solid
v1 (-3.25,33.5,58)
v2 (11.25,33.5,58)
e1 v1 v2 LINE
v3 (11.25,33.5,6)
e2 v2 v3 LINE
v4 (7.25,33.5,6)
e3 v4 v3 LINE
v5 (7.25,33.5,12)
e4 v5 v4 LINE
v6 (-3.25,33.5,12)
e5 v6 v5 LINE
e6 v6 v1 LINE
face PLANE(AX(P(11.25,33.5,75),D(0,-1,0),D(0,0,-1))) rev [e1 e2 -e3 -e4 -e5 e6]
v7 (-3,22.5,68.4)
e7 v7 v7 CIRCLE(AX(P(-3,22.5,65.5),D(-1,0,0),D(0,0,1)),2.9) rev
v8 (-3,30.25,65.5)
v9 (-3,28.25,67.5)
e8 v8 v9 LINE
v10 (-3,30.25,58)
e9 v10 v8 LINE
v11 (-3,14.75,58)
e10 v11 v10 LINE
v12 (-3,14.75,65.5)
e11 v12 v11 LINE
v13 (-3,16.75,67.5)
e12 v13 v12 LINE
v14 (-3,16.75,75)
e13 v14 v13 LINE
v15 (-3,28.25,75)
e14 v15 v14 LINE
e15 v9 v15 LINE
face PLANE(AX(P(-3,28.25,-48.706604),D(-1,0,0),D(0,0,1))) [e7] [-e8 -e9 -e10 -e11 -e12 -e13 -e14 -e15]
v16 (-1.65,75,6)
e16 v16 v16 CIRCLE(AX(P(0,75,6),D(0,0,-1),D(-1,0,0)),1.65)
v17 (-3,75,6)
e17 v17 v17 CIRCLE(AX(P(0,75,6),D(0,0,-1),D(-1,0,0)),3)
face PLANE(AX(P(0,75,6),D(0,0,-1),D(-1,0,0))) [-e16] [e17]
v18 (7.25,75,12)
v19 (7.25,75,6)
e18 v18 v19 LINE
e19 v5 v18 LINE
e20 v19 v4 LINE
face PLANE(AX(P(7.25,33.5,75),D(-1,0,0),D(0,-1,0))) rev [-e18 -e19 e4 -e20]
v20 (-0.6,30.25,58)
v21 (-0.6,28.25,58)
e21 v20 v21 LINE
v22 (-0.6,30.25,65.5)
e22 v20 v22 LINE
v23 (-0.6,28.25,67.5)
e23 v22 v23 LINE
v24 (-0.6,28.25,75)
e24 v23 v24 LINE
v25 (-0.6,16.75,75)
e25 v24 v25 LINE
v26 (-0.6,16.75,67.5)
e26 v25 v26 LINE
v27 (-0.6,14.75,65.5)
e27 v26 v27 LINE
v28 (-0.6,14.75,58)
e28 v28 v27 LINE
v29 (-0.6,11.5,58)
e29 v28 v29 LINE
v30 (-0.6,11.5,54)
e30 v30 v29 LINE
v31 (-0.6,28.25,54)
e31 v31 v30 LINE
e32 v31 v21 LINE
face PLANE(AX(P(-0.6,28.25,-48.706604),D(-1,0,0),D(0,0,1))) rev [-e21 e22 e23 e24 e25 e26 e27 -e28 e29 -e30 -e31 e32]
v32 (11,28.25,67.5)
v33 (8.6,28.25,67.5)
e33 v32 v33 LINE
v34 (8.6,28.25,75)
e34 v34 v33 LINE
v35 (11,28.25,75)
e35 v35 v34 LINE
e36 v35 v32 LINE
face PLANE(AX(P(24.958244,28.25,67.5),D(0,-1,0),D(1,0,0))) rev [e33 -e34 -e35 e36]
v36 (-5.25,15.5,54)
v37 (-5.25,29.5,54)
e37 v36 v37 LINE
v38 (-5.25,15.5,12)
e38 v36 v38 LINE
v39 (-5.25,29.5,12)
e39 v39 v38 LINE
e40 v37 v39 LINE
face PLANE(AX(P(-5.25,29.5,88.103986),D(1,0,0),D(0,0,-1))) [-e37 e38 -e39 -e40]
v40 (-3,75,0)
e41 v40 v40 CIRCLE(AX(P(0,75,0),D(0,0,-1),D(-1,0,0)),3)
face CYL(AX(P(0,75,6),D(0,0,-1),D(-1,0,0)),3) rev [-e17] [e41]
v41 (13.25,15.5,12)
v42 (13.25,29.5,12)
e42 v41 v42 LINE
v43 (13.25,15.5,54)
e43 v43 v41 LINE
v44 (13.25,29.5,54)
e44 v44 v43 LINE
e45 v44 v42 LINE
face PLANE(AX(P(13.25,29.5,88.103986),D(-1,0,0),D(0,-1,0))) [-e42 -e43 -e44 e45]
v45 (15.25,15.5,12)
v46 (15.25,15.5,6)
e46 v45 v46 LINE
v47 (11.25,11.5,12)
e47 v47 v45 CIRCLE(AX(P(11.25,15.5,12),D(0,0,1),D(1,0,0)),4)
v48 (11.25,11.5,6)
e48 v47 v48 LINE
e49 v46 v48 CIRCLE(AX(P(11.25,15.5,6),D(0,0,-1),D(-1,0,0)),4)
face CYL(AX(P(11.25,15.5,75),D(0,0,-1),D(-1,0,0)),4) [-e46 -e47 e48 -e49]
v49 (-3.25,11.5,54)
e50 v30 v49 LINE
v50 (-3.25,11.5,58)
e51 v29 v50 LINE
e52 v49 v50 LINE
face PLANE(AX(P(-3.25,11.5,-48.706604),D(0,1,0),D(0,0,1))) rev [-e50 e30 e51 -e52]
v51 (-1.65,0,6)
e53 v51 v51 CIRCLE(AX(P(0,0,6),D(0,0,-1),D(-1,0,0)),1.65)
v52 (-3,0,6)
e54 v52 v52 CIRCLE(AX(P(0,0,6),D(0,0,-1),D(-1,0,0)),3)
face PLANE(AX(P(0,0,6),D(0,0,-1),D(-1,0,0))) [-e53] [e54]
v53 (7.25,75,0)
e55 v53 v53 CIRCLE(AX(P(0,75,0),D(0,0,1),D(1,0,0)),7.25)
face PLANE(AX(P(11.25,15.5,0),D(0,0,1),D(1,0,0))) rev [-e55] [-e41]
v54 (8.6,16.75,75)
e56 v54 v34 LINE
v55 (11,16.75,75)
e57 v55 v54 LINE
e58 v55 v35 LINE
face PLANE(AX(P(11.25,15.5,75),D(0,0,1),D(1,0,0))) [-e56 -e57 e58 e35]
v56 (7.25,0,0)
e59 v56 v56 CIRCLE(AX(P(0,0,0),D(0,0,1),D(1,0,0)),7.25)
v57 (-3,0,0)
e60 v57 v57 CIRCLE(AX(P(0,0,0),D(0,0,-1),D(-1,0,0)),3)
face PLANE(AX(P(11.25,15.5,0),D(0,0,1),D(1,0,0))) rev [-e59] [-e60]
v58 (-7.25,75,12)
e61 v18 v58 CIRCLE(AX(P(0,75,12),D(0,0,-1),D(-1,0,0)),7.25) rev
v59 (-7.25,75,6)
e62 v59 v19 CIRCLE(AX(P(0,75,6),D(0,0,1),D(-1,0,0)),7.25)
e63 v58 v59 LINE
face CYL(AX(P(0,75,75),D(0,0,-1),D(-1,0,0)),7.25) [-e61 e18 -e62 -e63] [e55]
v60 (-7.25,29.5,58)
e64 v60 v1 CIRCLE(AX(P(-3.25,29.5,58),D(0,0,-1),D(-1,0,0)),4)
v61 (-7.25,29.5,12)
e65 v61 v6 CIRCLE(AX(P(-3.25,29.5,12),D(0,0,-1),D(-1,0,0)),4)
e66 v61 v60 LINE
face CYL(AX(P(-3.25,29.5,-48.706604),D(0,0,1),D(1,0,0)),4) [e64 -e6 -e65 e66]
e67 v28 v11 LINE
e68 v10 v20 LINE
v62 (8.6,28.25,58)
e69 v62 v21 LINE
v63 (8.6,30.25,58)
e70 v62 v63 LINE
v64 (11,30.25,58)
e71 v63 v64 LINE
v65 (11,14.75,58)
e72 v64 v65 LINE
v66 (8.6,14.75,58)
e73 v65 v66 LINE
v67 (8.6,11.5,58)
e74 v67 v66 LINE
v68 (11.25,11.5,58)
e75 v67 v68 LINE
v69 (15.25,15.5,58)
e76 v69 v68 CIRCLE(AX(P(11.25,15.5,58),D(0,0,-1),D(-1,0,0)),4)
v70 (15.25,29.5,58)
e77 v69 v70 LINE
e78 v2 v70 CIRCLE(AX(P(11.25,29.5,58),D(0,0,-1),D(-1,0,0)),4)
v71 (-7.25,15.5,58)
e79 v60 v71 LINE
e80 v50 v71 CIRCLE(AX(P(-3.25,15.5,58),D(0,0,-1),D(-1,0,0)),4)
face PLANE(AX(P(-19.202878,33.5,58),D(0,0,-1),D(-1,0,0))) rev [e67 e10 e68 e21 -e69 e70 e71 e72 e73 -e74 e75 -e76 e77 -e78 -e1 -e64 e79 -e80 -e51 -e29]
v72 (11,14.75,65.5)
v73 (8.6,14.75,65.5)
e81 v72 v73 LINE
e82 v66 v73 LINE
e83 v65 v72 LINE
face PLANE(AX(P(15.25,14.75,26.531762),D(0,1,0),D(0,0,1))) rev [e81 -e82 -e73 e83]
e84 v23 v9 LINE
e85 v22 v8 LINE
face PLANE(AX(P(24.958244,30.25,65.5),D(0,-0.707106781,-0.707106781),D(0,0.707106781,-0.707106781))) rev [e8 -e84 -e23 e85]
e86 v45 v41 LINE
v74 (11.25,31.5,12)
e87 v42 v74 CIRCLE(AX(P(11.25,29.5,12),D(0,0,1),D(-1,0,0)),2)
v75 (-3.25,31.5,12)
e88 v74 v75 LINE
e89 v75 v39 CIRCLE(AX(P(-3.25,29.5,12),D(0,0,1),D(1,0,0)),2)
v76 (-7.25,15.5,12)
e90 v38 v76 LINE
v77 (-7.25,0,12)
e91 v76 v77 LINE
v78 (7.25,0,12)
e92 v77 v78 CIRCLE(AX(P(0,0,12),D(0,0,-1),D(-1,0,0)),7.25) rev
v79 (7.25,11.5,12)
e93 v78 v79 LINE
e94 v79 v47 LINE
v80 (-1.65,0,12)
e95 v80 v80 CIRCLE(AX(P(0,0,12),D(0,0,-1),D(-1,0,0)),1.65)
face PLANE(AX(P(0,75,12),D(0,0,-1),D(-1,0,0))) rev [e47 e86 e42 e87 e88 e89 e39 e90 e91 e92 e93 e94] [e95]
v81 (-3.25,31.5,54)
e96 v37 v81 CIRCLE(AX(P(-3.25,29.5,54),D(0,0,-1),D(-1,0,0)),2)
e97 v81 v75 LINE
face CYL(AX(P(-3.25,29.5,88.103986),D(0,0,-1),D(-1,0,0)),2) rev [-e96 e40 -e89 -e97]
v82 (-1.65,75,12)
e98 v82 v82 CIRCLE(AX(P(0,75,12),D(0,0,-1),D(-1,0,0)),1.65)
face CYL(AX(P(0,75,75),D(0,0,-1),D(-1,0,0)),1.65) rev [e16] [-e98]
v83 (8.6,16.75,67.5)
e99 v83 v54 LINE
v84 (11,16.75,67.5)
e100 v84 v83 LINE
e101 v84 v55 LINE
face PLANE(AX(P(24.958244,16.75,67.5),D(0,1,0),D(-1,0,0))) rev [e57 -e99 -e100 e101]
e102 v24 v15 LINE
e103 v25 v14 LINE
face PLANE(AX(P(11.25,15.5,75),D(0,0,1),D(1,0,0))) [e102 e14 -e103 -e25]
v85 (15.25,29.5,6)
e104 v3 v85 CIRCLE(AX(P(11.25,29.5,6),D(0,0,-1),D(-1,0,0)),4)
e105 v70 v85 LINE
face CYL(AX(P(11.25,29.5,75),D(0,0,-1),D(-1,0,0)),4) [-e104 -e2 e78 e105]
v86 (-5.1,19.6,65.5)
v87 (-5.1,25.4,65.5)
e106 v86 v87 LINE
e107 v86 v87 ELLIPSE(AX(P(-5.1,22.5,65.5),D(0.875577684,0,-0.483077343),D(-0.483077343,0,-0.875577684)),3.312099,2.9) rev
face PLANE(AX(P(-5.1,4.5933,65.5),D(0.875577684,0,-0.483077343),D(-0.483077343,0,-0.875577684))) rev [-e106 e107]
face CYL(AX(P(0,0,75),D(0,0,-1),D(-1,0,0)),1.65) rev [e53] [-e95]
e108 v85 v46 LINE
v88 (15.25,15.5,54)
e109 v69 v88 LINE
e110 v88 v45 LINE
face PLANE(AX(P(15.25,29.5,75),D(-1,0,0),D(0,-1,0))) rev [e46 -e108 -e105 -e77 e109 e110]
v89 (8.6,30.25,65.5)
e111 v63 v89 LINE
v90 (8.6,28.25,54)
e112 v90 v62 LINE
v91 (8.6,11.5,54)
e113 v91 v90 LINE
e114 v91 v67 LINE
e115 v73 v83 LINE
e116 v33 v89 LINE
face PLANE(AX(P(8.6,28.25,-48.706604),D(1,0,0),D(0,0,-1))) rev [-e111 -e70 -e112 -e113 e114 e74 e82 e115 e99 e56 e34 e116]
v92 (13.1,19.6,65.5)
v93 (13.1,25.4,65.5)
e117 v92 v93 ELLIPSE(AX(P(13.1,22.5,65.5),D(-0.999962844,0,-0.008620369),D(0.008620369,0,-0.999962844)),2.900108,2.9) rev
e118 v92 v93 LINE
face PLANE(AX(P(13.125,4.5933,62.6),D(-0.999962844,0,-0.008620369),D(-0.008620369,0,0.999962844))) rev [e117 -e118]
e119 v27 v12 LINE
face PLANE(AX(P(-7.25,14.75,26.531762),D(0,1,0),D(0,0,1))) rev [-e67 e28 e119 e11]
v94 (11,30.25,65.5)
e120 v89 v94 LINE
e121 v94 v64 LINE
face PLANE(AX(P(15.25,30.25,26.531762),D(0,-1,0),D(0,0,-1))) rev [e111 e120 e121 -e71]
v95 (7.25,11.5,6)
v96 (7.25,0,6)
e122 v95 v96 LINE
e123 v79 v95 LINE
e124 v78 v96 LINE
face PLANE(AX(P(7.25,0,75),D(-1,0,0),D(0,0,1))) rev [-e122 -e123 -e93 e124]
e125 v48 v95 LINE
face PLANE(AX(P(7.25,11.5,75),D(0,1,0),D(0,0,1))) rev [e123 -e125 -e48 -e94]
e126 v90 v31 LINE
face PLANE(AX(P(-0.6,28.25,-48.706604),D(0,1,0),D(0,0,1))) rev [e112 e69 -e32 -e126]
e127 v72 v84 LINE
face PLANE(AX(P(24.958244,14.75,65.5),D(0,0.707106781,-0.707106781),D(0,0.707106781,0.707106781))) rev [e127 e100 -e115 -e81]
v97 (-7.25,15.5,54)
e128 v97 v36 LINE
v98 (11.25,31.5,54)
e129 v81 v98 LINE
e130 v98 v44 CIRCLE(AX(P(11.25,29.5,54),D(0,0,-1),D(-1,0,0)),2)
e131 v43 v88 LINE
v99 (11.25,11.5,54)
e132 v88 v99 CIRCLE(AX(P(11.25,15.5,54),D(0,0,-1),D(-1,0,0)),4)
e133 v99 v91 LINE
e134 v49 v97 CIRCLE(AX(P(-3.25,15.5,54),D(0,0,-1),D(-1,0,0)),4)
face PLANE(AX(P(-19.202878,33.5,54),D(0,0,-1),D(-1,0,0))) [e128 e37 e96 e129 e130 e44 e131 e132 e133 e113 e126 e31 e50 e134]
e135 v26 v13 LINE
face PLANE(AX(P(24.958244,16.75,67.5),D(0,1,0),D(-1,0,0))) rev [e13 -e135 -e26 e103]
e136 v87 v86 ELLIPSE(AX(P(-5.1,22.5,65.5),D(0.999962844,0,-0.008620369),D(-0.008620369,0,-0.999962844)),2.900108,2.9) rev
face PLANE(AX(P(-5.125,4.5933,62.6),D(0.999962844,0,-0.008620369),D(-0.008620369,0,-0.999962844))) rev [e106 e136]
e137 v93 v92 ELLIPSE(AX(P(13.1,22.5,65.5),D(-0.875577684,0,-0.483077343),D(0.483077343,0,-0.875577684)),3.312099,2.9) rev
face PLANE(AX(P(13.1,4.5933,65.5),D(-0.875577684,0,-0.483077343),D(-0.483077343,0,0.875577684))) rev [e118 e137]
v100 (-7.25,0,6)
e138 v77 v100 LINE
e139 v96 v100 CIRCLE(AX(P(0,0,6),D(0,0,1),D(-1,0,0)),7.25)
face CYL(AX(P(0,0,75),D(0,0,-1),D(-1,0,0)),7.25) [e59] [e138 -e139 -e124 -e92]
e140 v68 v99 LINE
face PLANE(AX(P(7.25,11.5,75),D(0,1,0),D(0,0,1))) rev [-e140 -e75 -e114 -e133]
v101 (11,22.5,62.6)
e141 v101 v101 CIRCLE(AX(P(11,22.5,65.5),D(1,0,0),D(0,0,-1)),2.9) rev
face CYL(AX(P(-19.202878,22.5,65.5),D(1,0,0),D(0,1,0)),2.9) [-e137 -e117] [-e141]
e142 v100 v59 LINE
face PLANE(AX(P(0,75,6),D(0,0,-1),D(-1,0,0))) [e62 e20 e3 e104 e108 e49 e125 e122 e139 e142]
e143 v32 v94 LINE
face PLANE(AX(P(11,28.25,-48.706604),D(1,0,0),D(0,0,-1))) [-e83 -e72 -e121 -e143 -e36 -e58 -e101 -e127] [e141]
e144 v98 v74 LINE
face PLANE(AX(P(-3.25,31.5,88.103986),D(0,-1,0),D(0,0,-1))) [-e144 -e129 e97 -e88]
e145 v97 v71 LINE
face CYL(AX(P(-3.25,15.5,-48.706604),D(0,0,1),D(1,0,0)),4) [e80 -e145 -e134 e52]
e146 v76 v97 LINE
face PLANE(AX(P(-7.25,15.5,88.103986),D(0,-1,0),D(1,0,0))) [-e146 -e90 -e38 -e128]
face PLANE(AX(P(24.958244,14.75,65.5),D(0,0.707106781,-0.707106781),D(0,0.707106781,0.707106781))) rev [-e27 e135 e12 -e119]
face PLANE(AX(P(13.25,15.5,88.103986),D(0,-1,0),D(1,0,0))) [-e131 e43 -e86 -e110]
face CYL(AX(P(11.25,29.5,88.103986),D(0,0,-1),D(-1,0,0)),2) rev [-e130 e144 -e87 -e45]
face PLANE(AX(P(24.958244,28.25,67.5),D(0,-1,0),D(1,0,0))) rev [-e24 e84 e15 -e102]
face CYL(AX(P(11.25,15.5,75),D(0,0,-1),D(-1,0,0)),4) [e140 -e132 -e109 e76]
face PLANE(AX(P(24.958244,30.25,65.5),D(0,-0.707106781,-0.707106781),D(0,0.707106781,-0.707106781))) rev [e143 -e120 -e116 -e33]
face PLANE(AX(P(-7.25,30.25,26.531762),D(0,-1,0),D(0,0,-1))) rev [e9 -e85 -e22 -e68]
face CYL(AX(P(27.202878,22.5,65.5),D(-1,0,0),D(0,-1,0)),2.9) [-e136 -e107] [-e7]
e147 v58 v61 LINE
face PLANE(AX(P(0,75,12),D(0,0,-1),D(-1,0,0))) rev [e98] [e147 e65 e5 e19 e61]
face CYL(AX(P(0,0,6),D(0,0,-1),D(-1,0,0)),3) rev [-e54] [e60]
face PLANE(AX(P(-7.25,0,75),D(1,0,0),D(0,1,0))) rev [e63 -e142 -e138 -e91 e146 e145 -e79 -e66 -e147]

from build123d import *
from build123d.topology import SkipClean

# Parameters (mm, degrees)
SKETCH1_R           = 1.65
BOSS_EXTRUDE1_DEPTH = 75
SKETCH7_R           = 3
CUT_EXTRUDE6_DEPTH  = 6
CUT_EXTRUDE12_START = -63
CUT_EXTRUDE12_DEPTH = 63
SKETCH9_W           = 17
SKETCH9_H           = 22
SKETCH9_R           = 2.9
CUT_EXTRUDE8_DEPTH  = 4.25
CUT_EXTRUDE9_START  = -4.25
SKETCH10_W          = 17
SKETCH10_H          = 22
SKETCH10_R          = 2.9
CUT_EXTRUDE9_DEPTH  = 4.25
CUT_EXTRUDE10_DEPTH = 17
CUT_EXTRUDE11_START = -18.25
CUT_EXTRUDE11_DEPTH = 14
CUT_EXTRUDE13_START = -13.9000001
CUT_EXTRUDE13_DEPTH = 6.9000001
CUT_EXTRUDE14_DEPTH = 42


with BuildPart() as part:
    # Sketch1 → Boss-Extrude1 (new body)
    with BuildSketch(Plane.XY):
        with BuildLine():
            Line((15.25, 29.5), (15.25, 15.5))
            ThreePointArc((15.25, 15.5), (14.078427125, 12.671572875), (11.25, 11.5))
            Line((11.25, 11.5), (7.25, 11.5))
            Line((7.25, 11.5), (7.25, 0))
            ThreePointArc((7.25, 0), (0, -7.25), (-7.25, 0))
            Line((-7.25, 0), (-7.25, 75))
            ThreePointArc((-7.25, 75), (0, 82.25), (7.25, 75))
            Line((7.25, 75), (7.25, 33.5))
            Line((7.25, 33.5), (11.25, 33.5))
            ThreePointArc((11.25, 33.5), (14.078427125, 32.328427125), (15.25, 29.5))
        make_face()
        Circle(SKETCH1_R, mode=Mode.SUBTRACT)
        with Locations((0, 75)):
            Circle(SKETCH1_R, mode=Mode.SUBTRACT)
    extrude(amount=BOSS_EXTRUDE1_DEPTH)

    # Sketch7 → Cut-Extrude6 (cut)
    with SkipClean():  # the faces are left unmerged after this step: merging them gives an invalid solid
        with BuildSketch(Plane(origin=(0, 0, 0), x_dir=(-1, 0, 0), z_dir=(0, 0, -1))):
            with Locations((0, 75)):
                Circle(SKETCH7_R)
            Circle(SKETCH7_R)
            with BuildLine():
                Line((-7.25, 75), (-7.25, 33.5))
                Line((-7.25, 33.5), (-11.25, 33.5))
                ThreePointArc((-11.25, 33.5), (-14.078427125, 32.328427125), (-15.25, 29.5))
                Line((-15.25, 29.5), (-15.25, 15.5))
                ThreePointArc((-15.25, 15.5), (-14.078427125, 12.671572875), (-11.25, 11.5))
                Line((-11.25, 11.5), (-7.25, 11.5))
                Line((-7.25, 11.5), (-7.25, 0))
                ThreePointArc((-7.25, 0), (0, 7.25), (7.25, 0))
                Line((7.25, 0), (7.25, 75))
                ThreePointArc((7.25, 75), (0, 67.75), (-7.25, 75))
            make_face()
        extrude(amount=-CUT_EXTRUDE6_DEPTH, mode=Mode.SUBTRACT)

    # Sketch14 → Cut-Extrude12 (cut)
    with SkipClean():  # the faces are left unmerged after this step: merging them gives an invalid solid
        with BuildSketch(Plane.XY.offset(75).offset(CUT_EXTRUDE12_START)):
            with BuildLine():
                Line((-0.6, 28.25), (8.6, 28.25))
                Line((8.6, 28.25), (8.6, 11.5))
                Line((8.6, 11.5), (7.25, 11.5))
                Line((7.25, 11.5), (7.25, 0))
                ThreePointArc((7.25, 0), (0, -7.25), (-7.25, 0))
                Line((-7.25, 0), (-7.25, 15.5))
                ThreePointArc((-7.25, 15.5), (-6.078427125, 12.671572875), (-3.25, 11.5))
                Line((-3.25, 11.5), (-0.6, 11.5))
                Line((-0.6, 11.5), (-0.6, 28.25))
            make_face()
            with BuildLine():
                Line((7.25, 33.5), (-3.25, 33.5))
                ThreePointArc((-3.25, 33.5), (-6.078427125, 32.328427125), (-7.25, 29.5))
                Line((-7.25, 29.5), (-7.25, 75))
                ThreePointArc((-7.25, 75), (0, 82.25), (7.25, 75))
                Line((7.25, 75), (7.25, 33.5))
            make_face()
        extrude(amount=CUT_EXTRUDE12_DEPTH, mode=Mode.SUBTRACT)

    # Sketch9 → Cut-Extrude8 (cut)
    with SkipClean():  # the faces are left unmerged after this step: merging them gives an invalid solid
        with BuildSketch(Plane(origin=(15.25, 0, 0), x_dir=(0, 0, -1), z_dir=(1, 0, 0))):
            with Locations((-66.5, 22.5)):
                Rectangle(SKETCH9_W, SKETCH9_H)
            with Locations(Location((-65.5, 22.5, 0), (0, 0, 90))):
                Circle(SKETCH9_R, mode=Mode.SUBTRACT)
        extrude(amount=-CUT_EXTRUDE8_DEPTH, mode=Mode.SUBTRACT)

    # Sketch10 → Cut-Extrude9 (cut)
    with SkipClean():  # the faces are left unmerged after this step: merging them gives an invalid solid
        with BuildSketch(Plane.ZY.offset(7.25).offset(CUT_EXTRUDE9_START)):
            with Locations((66.5, 22.5)):
                Rectangle(SKETCH10_W, SKETCH10_H)
            with Locations(Location((65.5, 22.5, 0), (0, 0, 90))):
                Circle(SKETCH10_R, mode=Mode.SUBTRACT)
        extrude(amount=CUT_EXTRUDE9_DEPTH, mode=Mode.SUBTRACT)

    # Sketch11 → Cut-Extrude10 (cut)
    with SkipClean():  # the faces are left unmerged after this step: merging them gives an invalid solid
        with BuildSketch(Plane.XY.offset(75)):
            Polygon((-7.25, 14.75), (-7.25, 11.5), (15.25, 11.5), (15.25, 14.75), (8.6, 14.75), (8.6, 30.25), (15.25, 30.25), (15.25, 33.5), (-7.25, 33.5), (-7.25, 30.25), (-0.6, 30.25), (-0.6, 14.75), align=None)
        extrude(amount=-CUT_EXTRUDE10_DEPTH, mode=Mode.SUBTRACT)

    # Cut-Extrude11: read off the stored shape, not the designer's step
    # Cut-Extrude11 outline → Cut-Extrude11 (cut)
    with SkipClean():  # the faces are left unmerged after this step: merging them gives an invalid solid
        with BuildSketch(Plane.ZY.offset(7.25).offset(CUT_EXTRUDE11_START)):
            Polygon((75, 16.75), (67.5, 16.75), (65.5, 14.75), (75, 14.75), align=None)
            Polygon((67.5, 28.25), (75, 28.25), (75, 30.25), (65.5, 30.25), align=None)
        extrude(amount=CUT_EXTRUDE11_DEPTH, mode=Mode.SUBTRACT)

    # Cut-Extrude13: read off the stored shape, not the designer's step
    # Cut-Extrude13 outline → Cut-Extrude13 (cut)
    with SkipClean():  # the faces are left unmerged after this step: merging them gives an invalid solid
        with BuildSketch(Plane(origin=(0, 33.5, 0), x_dir=(1, 0, 0), z_dir=(0, 1, 0)).offset(CUT_EXTRUDE13_START)):
            Polygon((-3.5, -68.4), (-5.1, -65.5), (-5.125, -62.6), (-7.25, -62.6), (-7.25, -68.4), align=None)
            Polygon((13.125, -62.6), (13.1, -65.5), (11.5, -68.4), (15.25, -68.4), (15.25, -62.6), align=None)
        extrude(amount=CUT_EXTRUDE13_DEPTH, mode=Mode.SUBTRACT)

    # Sketch15 → Cut-Extrude14 (cut)
    with SkipClean():  # the faces are left unmerged after this step: merging them gives an invalid solid
        with BuildSketch(Plane.XY.offset(12)):
            with BuildLine():
                Line((-3.25, 11.5), (11.25, 11.5))
                ThreePointArc((11.25, 11.5), (14.078427125, 12.671572875), (15.25, 15.5))
                Line((15.25, 15.5), (13.25, 15.5))
                Line((13.25, 15.5), (13.25, 29.5))
                ThreePointArc((13.25, 29.5), (12.664213562, 30.914213562), (11.25, 31.5))
                Line((11.25, 31.5), (-3.25, 31.5))
                ThreePointArc((-3.25, 31.5), (-4.664213562, 30.914213562), (-5.25, 29.5))
                Line((-5.25, 29.5), (-5.25, 15.5))
                Line((-5.25, 15.5), (-7.25, 15.5))
                ThreePointArc((-7.25, 15.5), (-6.078427125, 12.671572875), (-3.25, 11.5))
            make_face()
        extrude(amount=CUT_EXTRUDE14_DEPTH, mode=Mode.SUBTRACT)


solid = part.part
